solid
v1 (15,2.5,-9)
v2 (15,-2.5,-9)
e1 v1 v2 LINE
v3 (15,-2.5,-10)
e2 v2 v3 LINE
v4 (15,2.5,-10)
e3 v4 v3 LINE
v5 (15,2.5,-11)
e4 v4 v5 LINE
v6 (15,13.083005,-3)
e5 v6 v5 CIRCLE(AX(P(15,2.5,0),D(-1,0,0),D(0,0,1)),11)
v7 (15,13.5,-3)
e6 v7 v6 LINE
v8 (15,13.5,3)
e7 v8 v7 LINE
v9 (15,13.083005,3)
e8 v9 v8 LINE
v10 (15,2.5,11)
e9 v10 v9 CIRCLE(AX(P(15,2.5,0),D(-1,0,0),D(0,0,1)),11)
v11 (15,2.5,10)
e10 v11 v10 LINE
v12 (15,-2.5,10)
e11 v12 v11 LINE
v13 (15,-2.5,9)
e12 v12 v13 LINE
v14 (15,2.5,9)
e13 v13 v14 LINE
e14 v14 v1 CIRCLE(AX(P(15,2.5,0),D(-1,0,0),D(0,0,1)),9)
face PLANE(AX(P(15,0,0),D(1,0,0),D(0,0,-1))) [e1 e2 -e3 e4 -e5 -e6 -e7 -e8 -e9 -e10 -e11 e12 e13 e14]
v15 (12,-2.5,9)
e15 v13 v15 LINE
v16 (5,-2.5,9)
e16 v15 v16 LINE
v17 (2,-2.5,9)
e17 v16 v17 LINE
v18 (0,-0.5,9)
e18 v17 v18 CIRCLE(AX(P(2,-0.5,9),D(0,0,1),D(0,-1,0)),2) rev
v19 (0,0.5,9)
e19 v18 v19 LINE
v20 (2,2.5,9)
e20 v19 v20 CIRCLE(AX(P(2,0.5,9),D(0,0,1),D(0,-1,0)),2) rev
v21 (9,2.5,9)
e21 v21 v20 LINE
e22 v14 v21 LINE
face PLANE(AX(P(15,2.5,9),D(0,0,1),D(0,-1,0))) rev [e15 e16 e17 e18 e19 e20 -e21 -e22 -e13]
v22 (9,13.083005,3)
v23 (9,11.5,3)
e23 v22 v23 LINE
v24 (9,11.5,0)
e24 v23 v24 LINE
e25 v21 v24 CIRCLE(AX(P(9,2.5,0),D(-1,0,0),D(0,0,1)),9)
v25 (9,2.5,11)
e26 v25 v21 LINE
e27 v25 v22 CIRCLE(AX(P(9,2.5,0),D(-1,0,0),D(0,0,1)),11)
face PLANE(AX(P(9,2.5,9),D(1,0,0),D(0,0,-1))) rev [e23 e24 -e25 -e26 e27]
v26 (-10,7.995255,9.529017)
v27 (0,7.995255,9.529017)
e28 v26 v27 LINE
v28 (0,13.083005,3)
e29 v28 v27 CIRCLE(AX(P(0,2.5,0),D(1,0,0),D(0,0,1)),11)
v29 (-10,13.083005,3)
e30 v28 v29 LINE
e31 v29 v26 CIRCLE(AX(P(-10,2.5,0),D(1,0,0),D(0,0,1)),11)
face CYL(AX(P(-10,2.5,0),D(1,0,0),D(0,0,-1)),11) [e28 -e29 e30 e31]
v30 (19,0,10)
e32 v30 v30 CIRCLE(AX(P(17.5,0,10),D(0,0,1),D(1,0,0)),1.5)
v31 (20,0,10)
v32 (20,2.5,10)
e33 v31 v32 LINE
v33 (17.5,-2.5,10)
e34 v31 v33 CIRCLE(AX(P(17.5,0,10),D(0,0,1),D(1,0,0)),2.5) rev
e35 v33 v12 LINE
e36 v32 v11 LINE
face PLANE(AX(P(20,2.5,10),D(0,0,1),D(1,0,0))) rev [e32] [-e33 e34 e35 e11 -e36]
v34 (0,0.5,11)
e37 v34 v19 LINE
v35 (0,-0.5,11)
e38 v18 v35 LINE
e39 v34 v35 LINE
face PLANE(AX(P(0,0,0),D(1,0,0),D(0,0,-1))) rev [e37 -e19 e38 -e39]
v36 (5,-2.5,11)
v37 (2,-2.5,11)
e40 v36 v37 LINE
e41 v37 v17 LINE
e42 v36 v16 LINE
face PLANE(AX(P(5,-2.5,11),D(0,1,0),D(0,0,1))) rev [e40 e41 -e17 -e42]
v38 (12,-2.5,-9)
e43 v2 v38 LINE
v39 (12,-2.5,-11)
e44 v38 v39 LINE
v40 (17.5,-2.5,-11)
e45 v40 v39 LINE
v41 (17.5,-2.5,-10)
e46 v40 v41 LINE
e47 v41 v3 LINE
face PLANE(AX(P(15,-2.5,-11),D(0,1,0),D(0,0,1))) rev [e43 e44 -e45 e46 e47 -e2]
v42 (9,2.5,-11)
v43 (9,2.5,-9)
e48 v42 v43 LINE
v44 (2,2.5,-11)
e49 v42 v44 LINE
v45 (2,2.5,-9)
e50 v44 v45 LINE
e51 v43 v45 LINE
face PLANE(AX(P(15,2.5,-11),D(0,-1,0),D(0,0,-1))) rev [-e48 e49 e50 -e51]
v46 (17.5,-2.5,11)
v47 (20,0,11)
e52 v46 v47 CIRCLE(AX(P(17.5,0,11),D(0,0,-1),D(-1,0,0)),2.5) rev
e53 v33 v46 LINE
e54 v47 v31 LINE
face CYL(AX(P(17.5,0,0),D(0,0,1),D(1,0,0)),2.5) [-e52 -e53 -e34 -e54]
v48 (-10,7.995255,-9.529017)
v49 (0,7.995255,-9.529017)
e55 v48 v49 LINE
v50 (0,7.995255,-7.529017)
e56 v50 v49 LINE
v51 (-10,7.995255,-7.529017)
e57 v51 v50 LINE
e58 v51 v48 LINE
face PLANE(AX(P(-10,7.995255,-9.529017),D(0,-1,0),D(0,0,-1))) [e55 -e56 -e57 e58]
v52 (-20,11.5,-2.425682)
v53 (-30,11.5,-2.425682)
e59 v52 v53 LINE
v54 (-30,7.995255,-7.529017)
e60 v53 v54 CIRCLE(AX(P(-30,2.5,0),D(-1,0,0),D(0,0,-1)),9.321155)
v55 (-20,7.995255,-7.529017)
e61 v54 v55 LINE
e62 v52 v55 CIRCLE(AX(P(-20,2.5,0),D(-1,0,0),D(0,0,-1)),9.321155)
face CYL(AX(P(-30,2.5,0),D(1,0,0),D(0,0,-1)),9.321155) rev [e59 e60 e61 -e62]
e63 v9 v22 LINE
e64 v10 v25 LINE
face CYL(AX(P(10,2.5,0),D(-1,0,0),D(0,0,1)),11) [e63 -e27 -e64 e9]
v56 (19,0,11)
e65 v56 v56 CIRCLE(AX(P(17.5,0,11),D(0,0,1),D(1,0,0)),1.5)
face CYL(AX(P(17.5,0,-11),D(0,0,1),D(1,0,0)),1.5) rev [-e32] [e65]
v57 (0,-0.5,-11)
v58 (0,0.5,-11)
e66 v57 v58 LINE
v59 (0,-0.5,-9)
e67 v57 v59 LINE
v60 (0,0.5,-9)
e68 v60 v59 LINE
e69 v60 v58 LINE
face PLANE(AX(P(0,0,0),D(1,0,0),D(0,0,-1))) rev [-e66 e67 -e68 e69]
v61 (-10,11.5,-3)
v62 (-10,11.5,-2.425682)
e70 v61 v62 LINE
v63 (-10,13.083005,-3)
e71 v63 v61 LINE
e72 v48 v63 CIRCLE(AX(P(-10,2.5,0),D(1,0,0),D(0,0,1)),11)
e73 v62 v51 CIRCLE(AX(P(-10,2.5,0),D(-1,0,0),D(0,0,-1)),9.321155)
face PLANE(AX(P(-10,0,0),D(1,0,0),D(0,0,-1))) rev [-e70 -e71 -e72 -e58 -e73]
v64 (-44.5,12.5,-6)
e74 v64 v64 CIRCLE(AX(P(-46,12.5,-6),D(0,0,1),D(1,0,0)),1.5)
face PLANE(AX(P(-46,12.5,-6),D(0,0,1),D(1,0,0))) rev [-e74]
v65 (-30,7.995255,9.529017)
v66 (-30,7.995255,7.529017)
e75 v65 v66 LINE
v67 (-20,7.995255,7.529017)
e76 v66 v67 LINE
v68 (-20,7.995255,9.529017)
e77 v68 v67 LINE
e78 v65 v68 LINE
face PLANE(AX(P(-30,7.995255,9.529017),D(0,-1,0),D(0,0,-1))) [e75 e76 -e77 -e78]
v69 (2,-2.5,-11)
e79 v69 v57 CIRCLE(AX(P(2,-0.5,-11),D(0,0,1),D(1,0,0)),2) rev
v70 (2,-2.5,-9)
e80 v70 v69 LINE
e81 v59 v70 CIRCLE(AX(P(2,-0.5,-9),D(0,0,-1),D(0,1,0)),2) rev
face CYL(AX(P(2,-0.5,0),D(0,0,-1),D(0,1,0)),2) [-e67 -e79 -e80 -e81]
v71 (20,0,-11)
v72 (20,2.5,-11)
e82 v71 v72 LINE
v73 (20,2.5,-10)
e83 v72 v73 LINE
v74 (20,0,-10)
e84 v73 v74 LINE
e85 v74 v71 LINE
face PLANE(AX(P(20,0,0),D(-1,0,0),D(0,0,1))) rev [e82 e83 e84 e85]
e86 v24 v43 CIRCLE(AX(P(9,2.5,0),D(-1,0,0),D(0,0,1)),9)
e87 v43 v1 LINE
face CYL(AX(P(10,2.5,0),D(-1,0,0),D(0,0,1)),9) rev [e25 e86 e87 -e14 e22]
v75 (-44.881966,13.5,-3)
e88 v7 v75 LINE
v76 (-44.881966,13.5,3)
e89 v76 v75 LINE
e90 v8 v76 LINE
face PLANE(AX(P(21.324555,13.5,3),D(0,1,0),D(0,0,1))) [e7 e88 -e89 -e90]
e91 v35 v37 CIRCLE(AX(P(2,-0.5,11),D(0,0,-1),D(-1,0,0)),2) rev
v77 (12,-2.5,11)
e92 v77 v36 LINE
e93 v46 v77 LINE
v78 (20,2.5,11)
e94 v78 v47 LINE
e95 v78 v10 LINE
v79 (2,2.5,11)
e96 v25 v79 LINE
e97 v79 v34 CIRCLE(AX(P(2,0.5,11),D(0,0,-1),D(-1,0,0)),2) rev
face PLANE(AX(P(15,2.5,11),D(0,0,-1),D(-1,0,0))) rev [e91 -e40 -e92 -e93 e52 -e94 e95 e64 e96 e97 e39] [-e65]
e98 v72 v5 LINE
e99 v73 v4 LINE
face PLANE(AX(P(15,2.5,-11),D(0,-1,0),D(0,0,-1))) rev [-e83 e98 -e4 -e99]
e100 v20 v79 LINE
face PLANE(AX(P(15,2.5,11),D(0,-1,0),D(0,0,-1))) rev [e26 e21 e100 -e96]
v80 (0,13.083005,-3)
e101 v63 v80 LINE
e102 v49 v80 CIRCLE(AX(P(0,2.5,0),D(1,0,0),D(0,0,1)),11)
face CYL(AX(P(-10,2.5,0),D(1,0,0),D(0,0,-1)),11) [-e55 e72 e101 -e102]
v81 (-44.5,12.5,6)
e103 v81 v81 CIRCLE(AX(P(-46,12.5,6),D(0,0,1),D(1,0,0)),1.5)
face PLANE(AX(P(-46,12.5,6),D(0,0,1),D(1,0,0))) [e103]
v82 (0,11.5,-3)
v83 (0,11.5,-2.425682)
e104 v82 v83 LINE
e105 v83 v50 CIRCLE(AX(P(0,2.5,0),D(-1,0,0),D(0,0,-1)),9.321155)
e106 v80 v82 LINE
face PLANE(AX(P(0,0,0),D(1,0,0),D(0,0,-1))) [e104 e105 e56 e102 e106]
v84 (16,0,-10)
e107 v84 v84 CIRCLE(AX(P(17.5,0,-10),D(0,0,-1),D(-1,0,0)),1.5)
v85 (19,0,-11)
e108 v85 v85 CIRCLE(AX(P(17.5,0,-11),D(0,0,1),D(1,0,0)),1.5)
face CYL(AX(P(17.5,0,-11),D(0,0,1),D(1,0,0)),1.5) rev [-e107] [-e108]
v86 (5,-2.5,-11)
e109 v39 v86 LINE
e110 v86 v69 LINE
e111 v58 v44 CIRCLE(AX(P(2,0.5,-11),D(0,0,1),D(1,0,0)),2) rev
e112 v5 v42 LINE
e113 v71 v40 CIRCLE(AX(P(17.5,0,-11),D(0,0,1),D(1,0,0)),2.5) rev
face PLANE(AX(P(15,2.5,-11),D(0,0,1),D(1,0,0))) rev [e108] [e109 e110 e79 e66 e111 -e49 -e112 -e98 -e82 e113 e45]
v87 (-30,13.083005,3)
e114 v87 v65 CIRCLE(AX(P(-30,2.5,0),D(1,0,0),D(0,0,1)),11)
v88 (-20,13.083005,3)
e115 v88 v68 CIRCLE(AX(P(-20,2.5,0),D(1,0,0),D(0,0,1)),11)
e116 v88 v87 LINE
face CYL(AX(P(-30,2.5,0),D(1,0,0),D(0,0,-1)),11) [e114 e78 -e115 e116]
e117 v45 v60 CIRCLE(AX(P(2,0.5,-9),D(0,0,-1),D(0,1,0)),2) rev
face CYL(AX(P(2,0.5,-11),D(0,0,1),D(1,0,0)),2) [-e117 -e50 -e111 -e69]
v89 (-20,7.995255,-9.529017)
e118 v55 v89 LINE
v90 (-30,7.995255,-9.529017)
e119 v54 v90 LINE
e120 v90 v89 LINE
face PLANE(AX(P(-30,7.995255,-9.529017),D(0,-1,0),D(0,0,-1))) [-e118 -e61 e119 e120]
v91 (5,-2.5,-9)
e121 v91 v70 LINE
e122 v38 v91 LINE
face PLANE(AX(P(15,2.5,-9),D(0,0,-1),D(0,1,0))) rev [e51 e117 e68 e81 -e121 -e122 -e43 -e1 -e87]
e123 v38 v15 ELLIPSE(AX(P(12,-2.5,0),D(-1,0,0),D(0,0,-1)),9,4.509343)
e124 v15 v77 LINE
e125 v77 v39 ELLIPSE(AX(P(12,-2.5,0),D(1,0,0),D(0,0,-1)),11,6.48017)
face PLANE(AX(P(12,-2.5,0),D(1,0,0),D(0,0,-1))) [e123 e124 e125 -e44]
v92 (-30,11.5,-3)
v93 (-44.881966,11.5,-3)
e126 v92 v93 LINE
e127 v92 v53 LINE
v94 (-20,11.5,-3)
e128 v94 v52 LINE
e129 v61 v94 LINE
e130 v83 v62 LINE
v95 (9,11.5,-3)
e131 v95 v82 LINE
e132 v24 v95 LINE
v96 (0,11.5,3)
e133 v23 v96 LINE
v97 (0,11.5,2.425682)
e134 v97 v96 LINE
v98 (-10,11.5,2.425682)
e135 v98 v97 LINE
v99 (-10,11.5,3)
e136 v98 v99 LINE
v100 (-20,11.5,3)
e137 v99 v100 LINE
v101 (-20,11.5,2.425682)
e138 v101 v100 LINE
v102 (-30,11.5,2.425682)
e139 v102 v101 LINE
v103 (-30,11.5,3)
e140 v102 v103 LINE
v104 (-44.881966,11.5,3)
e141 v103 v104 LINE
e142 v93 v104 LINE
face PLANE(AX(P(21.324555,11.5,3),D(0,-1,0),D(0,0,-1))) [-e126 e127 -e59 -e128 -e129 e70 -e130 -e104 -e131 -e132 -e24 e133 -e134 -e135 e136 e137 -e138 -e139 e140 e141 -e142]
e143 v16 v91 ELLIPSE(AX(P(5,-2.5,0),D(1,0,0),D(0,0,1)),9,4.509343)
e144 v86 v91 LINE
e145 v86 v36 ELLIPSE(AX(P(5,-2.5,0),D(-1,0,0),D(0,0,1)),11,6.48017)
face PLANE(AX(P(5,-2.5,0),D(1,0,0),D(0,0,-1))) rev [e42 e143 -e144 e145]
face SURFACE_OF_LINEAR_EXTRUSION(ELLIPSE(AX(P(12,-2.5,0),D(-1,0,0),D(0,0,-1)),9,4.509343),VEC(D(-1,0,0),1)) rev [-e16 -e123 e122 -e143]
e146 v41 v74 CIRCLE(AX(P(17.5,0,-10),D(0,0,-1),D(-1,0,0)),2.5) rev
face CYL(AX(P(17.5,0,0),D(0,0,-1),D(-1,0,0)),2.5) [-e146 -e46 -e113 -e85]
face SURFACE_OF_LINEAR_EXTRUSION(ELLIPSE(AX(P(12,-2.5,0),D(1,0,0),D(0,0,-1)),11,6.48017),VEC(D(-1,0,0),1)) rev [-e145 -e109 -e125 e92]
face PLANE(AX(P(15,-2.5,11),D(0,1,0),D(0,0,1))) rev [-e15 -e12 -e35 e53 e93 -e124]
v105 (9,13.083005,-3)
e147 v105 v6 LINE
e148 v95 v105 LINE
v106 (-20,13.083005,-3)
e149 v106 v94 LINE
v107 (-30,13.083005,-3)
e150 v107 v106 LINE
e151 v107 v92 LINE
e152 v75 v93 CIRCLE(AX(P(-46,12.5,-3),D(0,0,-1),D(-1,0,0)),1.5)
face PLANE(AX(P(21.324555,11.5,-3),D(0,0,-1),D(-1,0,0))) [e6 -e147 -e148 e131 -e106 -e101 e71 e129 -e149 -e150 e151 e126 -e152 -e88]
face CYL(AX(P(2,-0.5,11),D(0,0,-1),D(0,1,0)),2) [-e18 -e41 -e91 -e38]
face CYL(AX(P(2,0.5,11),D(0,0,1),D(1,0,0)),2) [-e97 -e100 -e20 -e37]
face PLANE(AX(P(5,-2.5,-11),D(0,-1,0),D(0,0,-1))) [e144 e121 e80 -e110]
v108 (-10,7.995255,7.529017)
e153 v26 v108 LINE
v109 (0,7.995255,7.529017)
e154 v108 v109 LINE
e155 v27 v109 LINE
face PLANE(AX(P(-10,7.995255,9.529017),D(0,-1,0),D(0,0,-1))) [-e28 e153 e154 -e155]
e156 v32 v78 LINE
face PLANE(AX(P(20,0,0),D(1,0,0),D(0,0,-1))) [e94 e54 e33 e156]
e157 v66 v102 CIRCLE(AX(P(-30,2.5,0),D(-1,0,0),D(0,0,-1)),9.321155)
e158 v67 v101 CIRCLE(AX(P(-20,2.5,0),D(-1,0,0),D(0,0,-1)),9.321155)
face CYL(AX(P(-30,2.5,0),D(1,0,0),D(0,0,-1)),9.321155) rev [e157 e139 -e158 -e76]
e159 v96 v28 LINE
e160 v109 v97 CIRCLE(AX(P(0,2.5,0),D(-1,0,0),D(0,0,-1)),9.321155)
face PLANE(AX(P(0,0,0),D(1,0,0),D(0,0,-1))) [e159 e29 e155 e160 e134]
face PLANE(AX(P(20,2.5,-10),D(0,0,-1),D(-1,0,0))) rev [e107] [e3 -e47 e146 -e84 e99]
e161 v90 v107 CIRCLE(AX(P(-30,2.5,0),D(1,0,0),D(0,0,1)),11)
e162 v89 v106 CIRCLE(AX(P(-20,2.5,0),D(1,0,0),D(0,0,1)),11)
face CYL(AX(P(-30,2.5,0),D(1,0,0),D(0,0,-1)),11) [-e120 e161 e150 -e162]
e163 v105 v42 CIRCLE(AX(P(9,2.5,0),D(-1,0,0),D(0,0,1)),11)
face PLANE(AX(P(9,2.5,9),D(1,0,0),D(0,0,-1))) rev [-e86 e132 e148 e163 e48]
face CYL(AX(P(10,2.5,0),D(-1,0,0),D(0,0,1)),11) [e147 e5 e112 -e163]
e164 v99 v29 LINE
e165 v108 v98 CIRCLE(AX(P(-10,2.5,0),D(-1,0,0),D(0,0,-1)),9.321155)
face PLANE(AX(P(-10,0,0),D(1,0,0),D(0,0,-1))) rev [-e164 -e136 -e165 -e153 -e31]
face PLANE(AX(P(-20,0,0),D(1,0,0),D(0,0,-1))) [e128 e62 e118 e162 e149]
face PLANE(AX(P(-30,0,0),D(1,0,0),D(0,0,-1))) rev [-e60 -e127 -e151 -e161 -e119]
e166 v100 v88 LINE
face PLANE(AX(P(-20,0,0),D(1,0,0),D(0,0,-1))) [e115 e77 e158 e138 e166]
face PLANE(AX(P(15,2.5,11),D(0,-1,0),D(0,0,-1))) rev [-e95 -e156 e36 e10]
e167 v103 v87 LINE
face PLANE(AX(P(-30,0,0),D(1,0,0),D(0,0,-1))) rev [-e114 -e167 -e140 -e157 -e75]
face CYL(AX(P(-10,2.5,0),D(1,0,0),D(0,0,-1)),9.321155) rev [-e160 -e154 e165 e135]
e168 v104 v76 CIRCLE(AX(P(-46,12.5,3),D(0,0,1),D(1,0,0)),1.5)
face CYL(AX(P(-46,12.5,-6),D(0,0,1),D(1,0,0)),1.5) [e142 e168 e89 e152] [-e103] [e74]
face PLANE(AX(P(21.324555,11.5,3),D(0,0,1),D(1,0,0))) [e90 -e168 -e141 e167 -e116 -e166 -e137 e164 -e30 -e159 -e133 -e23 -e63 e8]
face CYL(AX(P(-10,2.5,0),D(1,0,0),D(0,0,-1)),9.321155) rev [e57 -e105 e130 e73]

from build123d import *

# Parameters (mm, degrees)
SKETCH1_W                = 2
SKETCH1_H                = 5
BOSS_EXTRUDE1_DEPTH      = 15
BOSS_EXTRUDE1_2_DEPTH    = 15
SKETCH2_W                = 1
SKETCH2_H                = 5
BOSS_EXTRUDE2_DEPTH      = 5
CUT_EXTRUDE1_DEPTH       = 30.107559156
CUT_EXTRUDE1_DEPTH_BACK  = 30.107559156
SKETCH3_R                = 1.5
SWEEP1_START             = 9
SWEEP1_DEPTH             = 6
BOSS_EXTRUDE3_DEPTH      = 12
CUT_EXTRUDE2_DEPTH       = 5
FILLET1_R                = 2
BOSS_EXTRUDE6_START      = -6
SKETCH7_W                = 6
SKETCH7_H                = 2
BOSS_EXTRUDE6_DEPTH      = 61
BOSS_EXTRUDE7_DEPTH      = 3
BOSS_EXTRUDE7_DEPTH_BACK = 9
SKETCH8_R                = 1.5
FILLET2_R                = 2.5
BOSS_EXTRUDE10_DEPTH     = 10
LPATTERN1_COUNT          = 2
LPATTERN1_PITCH          = 20


# Read off the part's stored shape, not the designer's step: Sweep1
with BuildPart() as part:
    # Sketch1 → Boss-Extrude1 (new body)
    with BuildSketch(Plane(origin=(0, 0, 0), x_dir=(0, 0, -1), z_dir=(1, 0, 0))):
        with Locations((-10, 0)):
            Rectangle(SKETCH1_W, SKETCH1_H)
    extrude(amount=BOSS_EXTRUDE1_DEPTH)



with BuildPart() as body_2:
    # Sketch1 → Boss-Extrude1 2 (new body)
    with BuildSketch(Plane(origin=(0, 0, 0), x_dir=(0, 0, -1), z_dir=(1, 0, 0))):
        with Locations((10, 0)):
            Rectangle(SKETCH1_W, SKETCH1_H)
    extrude(amount=BOSS_EXTRUDE1_2_DEPTH)


with BuildPart() as part_1:
    add(part.part)

    add(body_2.part)  # Boss-Extrude2 merges body 2
    # Sketch2 → Boss-Extrude2 (add)
    with BuildSketch(Plane(origin=(15, 0, 0), x_dir=(0, 0, -1), z_dir=(1, 0, 0))):
        with Locations((10.5, 0)):
            Rectangle(SKETCH2_W, SKETCH2_H)
        with Locations((-10.5, 0)):
            Rectangle(SKETCH2_W, SKETCH2_H)
    extrude(amount=BOSS_EXTRUDE2_DEPTH)

    # Sketch3 → Cut-Extrude1 (cut, two sides: drawn at the far end of the back side and taken through both)
    with BuildSketch(Plane.XY.offset(-10).offset(-CUT_EXTRUDE1_DEPTH_BACK)):
        with Locations((17.5, 0)):
            Circle(SKETCH3_R)
    extrude(amount=CUT_EXTRUDE1_DEPTH + CUT_EXTRUDE1_DEPTH_BACK, mode=Mode.SUBTRACT)

    # Sweep1 outline → Sweep1 (add)
    with BuildSketch(Plane.YZ.offset(SWEEP1_START)):
        with BuildLine():
            ThreePointArc((2.5, -11), (13.5, 0), (2.5, 11))
            Line((2.5, 11), (2.5, 9))
            ThreePointArc((2.5, 9), (11.5, 0), (2.5, -9))
            Line((2.5, -9), (2.5, -11))
        make_face()
    extrude(amount=SWEEP1_DEPTH)

    # Sketch5 → Boss-Extrude3 (add)
    with BuildSketch(Plane(origin=(0, 0, 0), x_dir=(0, 0, -1), z_dir=(1, 0, 0))):
        with BuildLine():
            Line((-9, -2.5), (-11, -2.5))
            add(Edge.make_bspline(
                [(-11, -2.5), (-11, -8.980170496), (0, -8.980170496)],
                knots=[3.141592654, 3.141592654, 3.141592654, 4.71238898, 4.71238898, 4.71238898], degree=2, weights=[1, 0.707106781, 1]))
            Line((0, -8.980170496), (0, -7.009343108))
            add(Edge.make_bspline(
                [(-9, -2.5), (-9, -7.009343108), (0, -7.009343108)],
                knots=[3.141592654, 3.141592654, 3.141592654, 4.71238898, 4.71238898, 4.71238898], degree=2, weights=[1, 0.707106781, 1]))
        make_face()
    boss_extrude3 = extrude(amount=BOSS_EXTRUDE3_DEPTH)

    # Sketch6 → Cut-Extrude2 (cut)
    with BuildSketch(Plane.ZY):
        with BuildLine():
            Line((11, -2.5), (9, -2.5))
            add(Edge.make_bspline(
                [(0, -7.009343108), (9, -7.009343108), (9, -2.5)],
                knots=[4.71238898, 4.71238898, 4.71238898, 6.283185307, 6.283185307, 6.283185307], degree=2, weights=[1, 0.707106781, 1]))
            Line((0, -7.009343108), (0, -8.980170496))
            add(Edge.make_bspline(
                [(0, -8.980170496), (11, -8.980170496), (11, -2.5)],
                knots=[4.71238898, 4.71238898, 4.71238898, 6.283185307, 6.283185307, 6.283185307], degree=2, weights=[1, 0.707106781, 1]))
        make_face()
    cut_extrude2 = extrude(amount=-CUT_EXTRUDE2_DEPTH, mode=Mode.SUBTRACT)

    # Mirror2: Boss-Extrude3, Cut-Extrude2 across plane
    add(boss_extrude3.mirror(Plane(origin=(12, -8.980170496, 0), x_dir=(1, 0, 0), z_dir=(0, 0, 1))))
    add(cut_extrude2.mirror(Plane(origin=(12, -8.980170496, 0), x_dir=(1, 0, 0), z_dir=(0, 0, 1))), mode=Mode.SUBTRACT)

    # Fillet1
    fillet1_edges = [part_1.edges().sort_by_distance(p)[0] for p in [
        (0, -2.5, -10),
        (0, 2.5, -10),
        (0, 2.5, 10),
        (0, -2.5, 10),
    ]]
    fillet(fillet1_edges, radius=FILLET1_R)

    # Sketch7 → Boss-Extrude6 (add)
    with BuildSketch(Plane.ZY.offset(-9).offset(BOSS_EXTRUDE6_START)):
        with Locations((0, 12.5)):
            Rectangle(SKETCH7_W, SKETCH7_H)
    extrude(amount=BOSS_EXTRUDE6_DEPTH)

    # Sketch8 → Boss-Extrude7 (add, two sides: drawn at the far end of the back side and taken through both)
    with BuildSketch(Plane.XY.offset(3).offset(-BOSS_EXTRUDE7_DEPTH_BACK)):
        with Locations((-46, 12.5)):
            Circle(SKETCH8_R)
    extrude(amount=BOSS_EXTRUDE7_DEPTH + BOSS_EXTRUDE7_DEPTH_BACK)

    # Fillet2
    fillet2_edges = [part_1.edges().sort_by_distance(p)[0] for p in [
        (20, -2.5, -10.5),
        (20, -2.5, 10.5),
    ]]
    fillet(fillet2_edges, radius=FILLET2_R)

    # 3DSketch3 → Boss-Extrude10 (add)
    with BuildSketch(Plane(origin=(-10, 7.995255445, 9.529017137), x_dir=(0, 0, -1), z_dir=(1, 0, 0))):
        with BuildLine():
            Line((0, 0), (2, 0))
            ThreePointArc((2, 0), (9.529017137, 3.825899604), (17.058034273, 0))
            Line((17.058034273, 0), (19.058034273, 0))
            ThreePointArc((19.058034273, 0), (15.031388903, 4.029654263), (9.529017137, 5.504744555))
            ThreePointArc((9.529017137, 5.504744555), (4.026645371, 4.029654263), (0, 0))
        make_face()
    boss_extrude10 = extrude(amount=BOSS_EXTRUDE10_DEPTH)

    # LPattern1: Boss-Extrude10 ×2
    with Locations(*[(-i * LPATTERN1_PITCH, 0, 0) for i in range(1, LPATTERN1_COUNT)]):
        add(boss_extrude10)


solid = part_1.part
